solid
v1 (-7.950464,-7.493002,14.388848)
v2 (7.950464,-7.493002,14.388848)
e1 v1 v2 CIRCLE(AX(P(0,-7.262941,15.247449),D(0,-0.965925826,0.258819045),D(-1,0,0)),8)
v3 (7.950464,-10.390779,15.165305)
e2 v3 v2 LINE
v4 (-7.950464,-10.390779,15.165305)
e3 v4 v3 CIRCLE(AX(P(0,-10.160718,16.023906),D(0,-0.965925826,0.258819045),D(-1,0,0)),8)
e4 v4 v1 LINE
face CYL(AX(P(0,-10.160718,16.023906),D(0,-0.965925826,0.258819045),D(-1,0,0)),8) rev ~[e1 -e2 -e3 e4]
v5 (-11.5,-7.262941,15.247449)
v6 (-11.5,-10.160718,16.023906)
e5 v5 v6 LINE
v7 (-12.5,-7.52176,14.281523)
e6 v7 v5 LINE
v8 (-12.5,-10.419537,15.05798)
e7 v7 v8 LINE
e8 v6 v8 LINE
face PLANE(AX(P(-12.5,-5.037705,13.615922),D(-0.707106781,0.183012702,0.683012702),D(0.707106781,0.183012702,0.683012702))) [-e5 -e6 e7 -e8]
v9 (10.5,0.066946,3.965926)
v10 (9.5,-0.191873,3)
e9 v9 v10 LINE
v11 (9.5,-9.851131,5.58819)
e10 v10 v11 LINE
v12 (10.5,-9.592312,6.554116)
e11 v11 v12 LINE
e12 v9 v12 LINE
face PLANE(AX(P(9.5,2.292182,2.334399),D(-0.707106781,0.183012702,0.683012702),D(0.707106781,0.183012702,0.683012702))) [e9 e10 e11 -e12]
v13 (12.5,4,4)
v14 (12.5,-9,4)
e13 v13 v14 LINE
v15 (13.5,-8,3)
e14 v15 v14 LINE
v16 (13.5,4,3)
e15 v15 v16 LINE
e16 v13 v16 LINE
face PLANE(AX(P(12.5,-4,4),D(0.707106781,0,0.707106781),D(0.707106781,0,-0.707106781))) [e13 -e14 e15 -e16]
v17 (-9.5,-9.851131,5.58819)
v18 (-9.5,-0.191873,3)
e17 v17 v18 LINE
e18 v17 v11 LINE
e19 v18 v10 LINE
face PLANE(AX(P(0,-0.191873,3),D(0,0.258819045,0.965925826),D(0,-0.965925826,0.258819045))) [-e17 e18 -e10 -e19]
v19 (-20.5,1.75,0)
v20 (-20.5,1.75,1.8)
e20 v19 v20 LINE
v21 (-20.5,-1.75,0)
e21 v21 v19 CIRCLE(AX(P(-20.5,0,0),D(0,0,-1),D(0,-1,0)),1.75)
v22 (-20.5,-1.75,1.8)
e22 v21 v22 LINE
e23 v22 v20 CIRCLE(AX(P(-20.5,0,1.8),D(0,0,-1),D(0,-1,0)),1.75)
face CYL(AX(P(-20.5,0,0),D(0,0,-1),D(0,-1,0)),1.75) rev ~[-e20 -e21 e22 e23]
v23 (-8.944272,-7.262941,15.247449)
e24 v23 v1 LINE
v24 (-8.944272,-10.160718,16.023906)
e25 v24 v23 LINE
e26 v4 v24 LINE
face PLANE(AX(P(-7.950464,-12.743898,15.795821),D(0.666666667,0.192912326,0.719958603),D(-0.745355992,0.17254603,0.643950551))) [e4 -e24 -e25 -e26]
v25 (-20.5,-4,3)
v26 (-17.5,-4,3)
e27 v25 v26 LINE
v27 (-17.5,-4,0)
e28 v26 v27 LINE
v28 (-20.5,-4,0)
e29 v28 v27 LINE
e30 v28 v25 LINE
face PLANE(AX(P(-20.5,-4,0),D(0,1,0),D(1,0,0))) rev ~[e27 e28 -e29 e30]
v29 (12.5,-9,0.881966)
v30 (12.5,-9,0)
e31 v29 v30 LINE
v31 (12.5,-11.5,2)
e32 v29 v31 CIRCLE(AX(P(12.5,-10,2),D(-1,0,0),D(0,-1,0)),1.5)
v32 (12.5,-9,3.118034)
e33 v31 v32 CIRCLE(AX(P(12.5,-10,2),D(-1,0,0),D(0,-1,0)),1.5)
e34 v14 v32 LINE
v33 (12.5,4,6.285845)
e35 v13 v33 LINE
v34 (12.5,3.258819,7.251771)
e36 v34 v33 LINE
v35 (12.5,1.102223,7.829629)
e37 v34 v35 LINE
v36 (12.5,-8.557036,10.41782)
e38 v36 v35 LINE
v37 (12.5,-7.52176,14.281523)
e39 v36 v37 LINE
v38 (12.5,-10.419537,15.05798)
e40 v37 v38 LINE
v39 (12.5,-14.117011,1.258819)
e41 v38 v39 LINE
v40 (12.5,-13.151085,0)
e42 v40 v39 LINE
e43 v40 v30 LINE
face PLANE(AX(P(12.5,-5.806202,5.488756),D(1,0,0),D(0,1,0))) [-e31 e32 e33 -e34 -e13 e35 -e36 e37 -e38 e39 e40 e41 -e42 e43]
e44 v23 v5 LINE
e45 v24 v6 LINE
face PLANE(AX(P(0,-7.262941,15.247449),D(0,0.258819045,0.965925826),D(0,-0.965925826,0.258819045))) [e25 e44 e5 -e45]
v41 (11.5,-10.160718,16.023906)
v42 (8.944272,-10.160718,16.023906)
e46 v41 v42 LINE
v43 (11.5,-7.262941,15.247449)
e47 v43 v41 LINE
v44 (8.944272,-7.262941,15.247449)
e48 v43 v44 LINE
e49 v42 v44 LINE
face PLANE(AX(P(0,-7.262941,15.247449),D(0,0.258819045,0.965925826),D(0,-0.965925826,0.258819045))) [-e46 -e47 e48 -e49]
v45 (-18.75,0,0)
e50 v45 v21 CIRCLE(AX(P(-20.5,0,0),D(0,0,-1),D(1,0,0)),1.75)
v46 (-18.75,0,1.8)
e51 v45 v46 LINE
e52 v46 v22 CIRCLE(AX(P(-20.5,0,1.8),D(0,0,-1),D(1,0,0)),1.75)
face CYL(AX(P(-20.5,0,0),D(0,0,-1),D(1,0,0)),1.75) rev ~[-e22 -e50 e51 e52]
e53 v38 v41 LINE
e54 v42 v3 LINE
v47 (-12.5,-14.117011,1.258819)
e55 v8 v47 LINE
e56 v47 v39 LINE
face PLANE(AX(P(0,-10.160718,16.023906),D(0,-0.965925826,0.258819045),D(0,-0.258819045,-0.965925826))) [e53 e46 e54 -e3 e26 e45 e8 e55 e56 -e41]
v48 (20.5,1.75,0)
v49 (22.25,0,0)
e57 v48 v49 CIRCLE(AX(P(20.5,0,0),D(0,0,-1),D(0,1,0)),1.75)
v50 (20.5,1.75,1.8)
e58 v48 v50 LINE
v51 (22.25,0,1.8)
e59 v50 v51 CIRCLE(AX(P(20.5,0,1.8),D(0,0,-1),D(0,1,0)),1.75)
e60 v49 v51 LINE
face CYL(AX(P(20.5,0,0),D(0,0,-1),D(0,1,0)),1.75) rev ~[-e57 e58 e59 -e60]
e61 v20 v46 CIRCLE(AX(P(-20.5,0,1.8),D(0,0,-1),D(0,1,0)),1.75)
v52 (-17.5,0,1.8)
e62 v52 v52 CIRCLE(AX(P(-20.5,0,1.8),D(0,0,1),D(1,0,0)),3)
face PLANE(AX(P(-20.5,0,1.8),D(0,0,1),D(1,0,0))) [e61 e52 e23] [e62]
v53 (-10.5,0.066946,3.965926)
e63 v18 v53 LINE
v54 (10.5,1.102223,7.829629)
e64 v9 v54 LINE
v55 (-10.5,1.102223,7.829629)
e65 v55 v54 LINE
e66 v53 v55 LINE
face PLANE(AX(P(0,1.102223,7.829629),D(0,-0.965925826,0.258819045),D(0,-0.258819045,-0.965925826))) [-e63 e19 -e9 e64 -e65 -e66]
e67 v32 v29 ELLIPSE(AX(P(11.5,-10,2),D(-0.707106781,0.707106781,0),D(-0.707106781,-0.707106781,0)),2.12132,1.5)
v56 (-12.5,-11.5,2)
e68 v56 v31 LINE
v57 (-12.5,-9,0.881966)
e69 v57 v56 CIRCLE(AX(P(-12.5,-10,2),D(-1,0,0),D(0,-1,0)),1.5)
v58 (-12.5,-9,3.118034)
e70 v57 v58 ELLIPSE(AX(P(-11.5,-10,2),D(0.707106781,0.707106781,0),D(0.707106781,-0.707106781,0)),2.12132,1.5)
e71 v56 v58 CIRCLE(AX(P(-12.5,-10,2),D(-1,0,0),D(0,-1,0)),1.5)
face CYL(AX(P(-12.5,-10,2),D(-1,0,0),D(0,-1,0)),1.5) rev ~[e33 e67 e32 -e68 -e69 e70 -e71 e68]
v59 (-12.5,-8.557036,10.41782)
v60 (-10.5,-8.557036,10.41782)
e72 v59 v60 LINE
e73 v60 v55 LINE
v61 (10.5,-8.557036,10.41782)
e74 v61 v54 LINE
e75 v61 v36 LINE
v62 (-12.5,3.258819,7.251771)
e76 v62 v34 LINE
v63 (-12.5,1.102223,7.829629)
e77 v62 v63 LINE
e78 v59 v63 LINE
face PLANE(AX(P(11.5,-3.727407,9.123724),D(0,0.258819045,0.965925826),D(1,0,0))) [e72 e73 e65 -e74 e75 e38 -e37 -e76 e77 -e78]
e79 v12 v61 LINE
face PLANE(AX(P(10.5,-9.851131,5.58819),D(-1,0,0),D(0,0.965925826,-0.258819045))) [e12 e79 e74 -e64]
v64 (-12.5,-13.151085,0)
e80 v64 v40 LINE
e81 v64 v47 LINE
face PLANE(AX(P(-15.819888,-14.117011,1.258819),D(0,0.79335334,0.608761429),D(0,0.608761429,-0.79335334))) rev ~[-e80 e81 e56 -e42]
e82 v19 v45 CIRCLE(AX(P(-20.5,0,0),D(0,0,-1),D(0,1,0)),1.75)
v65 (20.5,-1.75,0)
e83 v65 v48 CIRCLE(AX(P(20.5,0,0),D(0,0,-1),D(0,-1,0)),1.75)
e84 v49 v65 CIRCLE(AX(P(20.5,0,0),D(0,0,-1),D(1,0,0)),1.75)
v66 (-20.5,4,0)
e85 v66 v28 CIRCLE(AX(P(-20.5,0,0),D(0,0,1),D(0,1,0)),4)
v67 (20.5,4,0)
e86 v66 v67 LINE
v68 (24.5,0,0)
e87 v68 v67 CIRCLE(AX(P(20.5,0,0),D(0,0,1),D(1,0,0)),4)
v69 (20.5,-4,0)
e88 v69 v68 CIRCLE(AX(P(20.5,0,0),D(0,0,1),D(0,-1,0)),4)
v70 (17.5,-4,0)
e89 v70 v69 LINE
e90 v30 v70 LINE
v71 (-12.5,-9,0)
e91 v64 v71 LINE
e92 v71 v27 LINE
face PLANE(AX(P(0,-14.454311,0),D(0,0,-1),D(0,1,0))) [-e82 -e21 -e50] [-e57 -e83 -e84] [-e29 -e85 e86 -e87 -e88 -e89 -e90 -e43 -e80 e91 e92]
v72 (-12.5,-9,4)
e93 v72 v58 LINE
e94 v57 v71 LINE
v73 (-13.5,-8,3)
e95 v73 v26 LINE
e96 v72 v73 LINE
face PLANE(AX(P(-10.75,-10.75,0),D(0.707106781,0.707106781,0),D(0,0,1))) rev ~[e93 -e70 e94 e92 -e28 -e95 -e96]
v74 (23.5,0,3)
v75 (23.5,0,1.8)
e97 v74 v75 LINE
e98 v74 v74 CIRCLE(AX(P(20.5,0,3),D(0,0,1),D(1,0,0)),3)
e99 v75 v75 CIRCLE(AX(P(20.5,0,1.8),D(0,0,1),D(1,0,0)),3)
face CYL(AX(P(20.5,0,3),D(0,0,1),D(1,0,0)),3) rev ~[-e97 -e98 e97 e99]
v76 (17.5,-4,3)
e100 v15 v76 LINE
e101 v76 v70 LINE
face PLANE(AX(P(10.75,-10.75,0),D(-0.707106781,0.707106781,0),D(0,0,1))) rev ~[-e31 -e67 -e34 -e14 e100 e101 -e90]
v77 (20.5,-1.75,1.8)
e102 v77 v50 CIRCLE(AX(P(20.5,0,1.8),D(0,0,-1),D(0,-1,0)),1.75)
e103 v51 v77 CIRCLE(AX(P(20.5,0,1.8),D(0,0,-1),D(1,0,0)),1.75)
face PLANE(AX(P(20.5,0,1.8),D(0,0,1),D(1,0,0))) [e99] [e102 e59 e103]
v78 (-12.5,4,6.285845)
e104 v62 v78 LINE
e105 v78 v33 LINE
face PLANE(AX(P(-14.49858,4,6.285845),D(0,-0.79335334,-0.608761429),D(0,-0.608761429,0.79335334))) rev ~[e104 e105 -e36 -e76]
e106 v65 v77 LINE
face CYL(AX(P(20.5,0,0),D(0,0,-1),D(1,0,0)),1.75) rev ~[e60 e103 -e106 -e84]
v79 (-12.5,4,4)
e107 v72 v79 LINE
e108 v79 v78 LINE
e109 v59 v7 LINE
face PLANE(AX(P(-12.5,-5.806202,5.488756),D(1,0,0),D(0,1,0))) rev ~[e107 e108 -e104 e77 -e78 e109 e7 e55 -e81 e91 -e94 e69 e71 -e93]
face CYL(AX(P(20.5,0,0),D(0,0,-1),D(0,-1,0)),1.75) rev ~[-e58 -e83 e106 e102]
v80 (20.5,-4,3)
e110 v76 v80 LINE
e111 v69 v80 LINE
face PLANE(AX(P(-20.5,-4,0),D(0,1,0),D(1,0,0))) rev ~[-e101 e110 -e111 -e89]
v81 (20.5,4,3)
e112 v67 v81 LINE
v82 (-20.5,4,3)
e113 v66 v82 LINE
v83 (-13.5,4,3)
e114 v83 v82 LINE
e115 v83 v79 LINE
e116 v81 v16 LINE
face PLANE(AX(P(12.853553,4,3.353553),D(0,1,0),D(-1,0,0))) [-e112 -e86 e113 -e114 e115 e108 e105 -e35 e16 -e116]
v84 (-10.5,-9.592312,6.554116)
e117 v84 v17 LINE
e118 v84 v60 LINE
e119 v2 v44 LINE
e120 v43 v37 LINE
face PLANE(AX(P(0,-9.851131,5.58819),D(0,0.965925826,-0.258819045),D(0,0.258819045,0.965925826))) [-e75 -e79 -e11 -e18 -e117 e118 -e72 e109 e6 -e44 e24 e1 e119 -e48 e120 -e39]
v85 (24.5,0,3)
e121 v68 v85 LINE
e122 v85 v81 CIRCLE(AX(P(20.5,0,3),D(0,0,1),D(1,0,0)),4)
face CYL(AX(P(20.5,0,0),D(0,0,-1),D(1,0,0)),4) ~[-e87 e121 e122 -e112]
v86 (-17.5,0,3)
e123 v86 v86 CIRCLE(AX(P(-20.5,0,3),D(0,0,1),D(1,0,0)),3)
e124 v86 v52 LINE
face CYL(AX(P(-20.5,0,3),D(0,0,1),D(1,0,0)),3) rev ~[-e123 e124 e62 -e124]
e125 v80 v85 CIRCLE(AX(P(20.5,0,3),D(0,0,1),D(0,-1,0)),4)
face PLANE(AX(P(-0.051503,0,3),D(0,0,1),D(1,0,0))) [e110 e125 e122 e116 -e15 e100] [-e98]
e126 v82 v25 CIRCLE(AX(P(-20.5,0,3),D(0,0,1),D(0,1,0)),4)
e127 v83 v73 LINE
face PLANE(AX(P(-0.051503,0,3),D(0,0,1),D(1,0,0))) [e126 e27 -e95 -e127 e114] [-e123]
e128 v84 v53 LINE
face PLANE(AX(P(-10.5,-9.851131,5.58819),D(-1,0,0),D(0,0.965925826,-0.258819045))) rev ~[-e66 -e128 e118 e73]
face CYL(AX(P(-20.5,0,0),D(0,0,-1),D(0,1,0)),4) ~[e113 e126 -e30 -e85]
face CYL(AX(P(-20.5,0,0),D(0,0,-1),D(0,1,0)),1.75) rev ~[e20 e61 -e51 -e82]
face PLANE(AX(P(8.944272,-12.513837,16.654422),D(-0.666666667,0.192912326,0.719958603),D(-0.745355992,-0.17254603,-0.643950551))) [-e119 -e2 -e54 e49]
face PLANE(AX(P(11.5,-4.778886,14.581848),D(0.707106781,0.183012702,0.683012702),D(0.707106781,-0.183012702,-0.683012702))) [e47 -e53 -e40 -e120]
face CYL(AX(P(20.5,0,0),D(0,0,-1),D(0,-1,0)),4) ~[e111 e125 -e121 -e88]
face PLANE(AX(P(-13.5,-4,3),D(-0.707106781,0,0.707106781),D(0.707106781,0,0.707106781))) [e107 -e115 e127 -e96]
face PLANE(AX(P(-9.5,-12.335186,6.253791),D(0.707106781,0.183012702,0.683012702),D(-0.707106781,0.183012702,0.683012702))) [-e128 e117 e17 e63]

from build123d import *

# Parameters (mm, degrees)
F2_DEPTH       = 3
F3_R           = 3
F4_DEPTH       = 1.2
F5_DEPTH       = 12.5
F6_W           = 2
F6_H           = 10
F7_DEPTH       = 5
F9_DEPTH       = 3
F10_SIZE       = 5
F11_T1_DEPTH   = 15.1433659759
F11_T3_DEPTH   = 15.1433659759
F11_T5_DEPTH   = 8
F11_T10_DEPTH  = 7.571682988
F11_T15_DEPTH  = 7.571682988
F11_T17_DEPTH  = 7.8722554791
F11_T19_DEPTH  = 31.6397752967
F11_T21_DEPTH  = 8.1433659759
F11_T23_DEPTH  = 28.997160307
F12_R          = 1.5
F13_DEPTH      = 37.001
F13_DEPTH_BACK = 12.001


# Not quite as in the source:
# - a fillet or chamfer that OpenCascade refuses, or shapes differently, is made with other operations: its cross-section is extruded or revolved along the edge and cut away or added


with BuildPart() as f2:
    # F0 (on Top) → F2 (new body)
    with BuildSketch(Plane.XY):
        with BuildLine():
            ThreePointArc((20.5, -4), (16.5, 0), (20.5, 4))
            Line((20.5, 4), (-20.5, 4))
            ThreePointArc((-20.5, 4), (-17.6715728753, 2.8284271247), (-16.5, 0))
            ThreePointArc((-16.5, 0), (-17.6715728753, -2.8284271247), (-20.5, -4))
            Line((-20.5, -4), (20.5, -4))
        make_face()
        with BuildLine():
            ThreePointArc((24.5, 0), (23.3284271247, 2.8284271247), (20.5, 4))
            Line((20.5, 4), (20.5, 1.75))
            ThreePointArc((20.5, 1.75), (21.7374368671, 1.2374368671), (22.25, 0))
            ThreePointArc((22.25, 0), (21.7374368671, -1.2374368671), (20.5, -1.75))
            Line((20.5, -1.75), (20.5, -4))
            ThreePointArc((20.5, -4), (23.3284271247, -2.8284271247), (24.5, 0))
        make_face()
        with BuildLine():
            Line((20.5, 1.75), (20.5, 4))
            ThreePointArc((20.5, 4), (16.5, 0), (20.5, -4))
            Line((20.5, -4), (20.5, -1.75))
            ThreePointArc((20.5, -1.75), (18.75, 0), (20.5, 1.75))
        make_face()
        with BuildLine():
            ThreePointArc((-16.5, 0), (-17.6715728753, 2.8284271247), (-20.5, 4))
            Line((-20.5, 4), (-20.5, 1.75))
            ThreePointArc((-20.5, 1.75), (-19.2625631329, 1.2374368671), (-18.75, 0))
            ThreePointArc((-18.75, 0), (-19.2625631329, -1.2374368671), (-20.5, -1.75))
            Line((-20.5, -1.75), (-20.5, -4))
            ThreePointArc((-20.5, -4), (-17.6715728753, -2.8284271247), (-16.5, 0))
        make_face()
        with BuildLine():
            Line((-20.5, 1.75), (-20.5, 4))
            ThreePointArc((-20.5, 4), (-24.5, 0), (-20.5, -4))
            Line((-20.5, -4), (-20.5, -1.75))
            ThreePointArc((-20.5, -1.75), (-22.25, 0), (-20.5, 1.75))
        make_face()
    extrude(amount=F2_DEPTH)

    # F3 (on face) → F4 (cut)
    with BuildSketch(Plane.XY.offset(3)):
        with Locations((-20.5, 0)):
            Circle(F3_R)
        with Locations((20.5, 0)):
            Circle(F3_R)
    extrude(amount=-F4_DEPTH, mode=Mode.SUBTRACT)

    # F1 (on Right) → F5 (join, symmetric)
    with BuildSketch(Plane.YZ):
        Polygon((-14.454310627, 0), (0, 0), (4, 0), (4, 7.0531719961), (1.1022225211, 7.8296291314), (-0.1918727044, 3), (-9.8511309673, 5.588190451), (-7.2629405162, 15.2474487139), (-10.1607179951, 16.0239058492), align=None)
    extrude(amount=F5_DEPTH, both=True)

    # F6 (on face) → F7 (join, through all)
    with BuildSketch(Plane(origin=(0, 0.737146966, 2.7510699296), x_dir=(1, 0, 0), z_dir=(0, 0.2588190451, 0.9659258263))):
        with Locations((11.5, -5.9617919358)):
            Rectangle(F6_W, F6_H)
        with Locations((-11.5, -5.9617919358)):
            Rectangle(F6_W, F6_H)
    extrude(amount=F7_DEPTH)

    # F8 (on face) → F9 (cut, through all)
    with BuildSketch(Plane(origin=(0, -13.4860554121, 3.6135776568), x_dir=(1, 0, 0), z_dir=(0, -0.9659258263, 0.2588190451))):
        with BuildLine():
            ThreePointArc((-8, 12.8481171687), (0, 4.8481171687), (8, 12.8481171687))
            Line((8, 12.8481171687), (-8, 12.8481171687))
        make_face()
    extrude(amount=-F9_DEPTH, mode=Mode.SUBTRACT)

    # F10
    f10_edges = [f2.edges().sort_by_distance(p)[0] for p in [
        (-12.5, -4, 1.5),
        (12.5, -4, 1.5),
    ]]
    chamfer(f10_edges, length=F10_SIZE)

    # F11: chamfer of 1 on 12 edges, made by hand

    # F11_s2 → F11_t1 (join)
    with BuildSketch(Plane(origin=(0, -13.0723329483, 3.5027210567), x_dir=(1, 0, 0), z_dir=(0, 0.9659258263, -0.2588190451))):
        Polygon((-9.5, -2.8481171687), (-10.5, -3.8481171687), (-10.5, -2.8481171687), align=None)
    extrude(amount=F11_T1_DEPTH)

    # F11_s4 → F11_t3 (join)
    with BuildSketch(Plane(origin=(0, 1.5550353448, -0.4166704648), x_dir=(1, 0, 0), z_dir=(0, -0.9659258263, 0.2588190451))):
        Polygon((9.5, 2.8481171687), (10.5, 3.8481171687), (10.5, 2.8481171687), align=None)
    extrude(amount=F11_T3_DEPTH)

    # F11_s6 → F11_t5 (join)
    with BuildSketch(Plane.XZ.offset(-4)):
        Polygon((12.5, 4), (13.5, 3), (12.5, 3), align=None)
        Polygon((-13.5, 3), (-12.5, 4), (-12.5, 3), align=None)
    extrude(amount=F11_T5_DEPTH)


with BuildPart() as f11_tool8:
    # F11_s9 → F11_t10 (new body)
    with BuildSketch(Plane.XZ.offset(4)):
        Polygon((-13.5, 3), (-12.5, 4), (-12.5, 3), align=None)
    extrude(amount=F11_T10_DEPTH)

    split(bisect_by=Plane(origin=(-10.75, -10.75, 0), x_dir=(0, 0, 1), z_dir=(0.7071067812, 0.7071067812, 0)), keep=Keep.TOP)


with BuildPart() as f2_1:
    add(f2.part)

    # F11_t7: union F11_tool8
    add(f11_tool8.part)


with BuildPart() as f11_tool13:
    # F11_s14 → F11_t15 (new body)
    with BuildSketch(Plane.XZ.offset(4)):
        Polygon((12.5, 4), (13.5, 3), (12.5, 3), align=None)
    extrude(amount=F11_T15_DEPTH)

    split(bisect_by=Plane(origin=(10.75, -10.75, 0), x_dir=(0, 0, 1), z_dir=(-0.7071067812, 0.7071067812, 0)), keep=Keep.TOP)


with BuildPart() as f2_2:
    add(f2_1.part)

    # F11_t12: union F11_tool13
    add(f11_tool13.part)

    # F11_s18 → F11_t17 (cut)
    with BuildSketch(Plane(origin=(0, -15.8391741119, 4.244093912), x_dir=(1, 0, 0), z_dir=(0, 0.9659258263, -0.2588190451))):
        with BuildLine():
            Line((-7.95046392, -11.9592282798), (-8.94427191, -12.8481171687))
            Line((-8.94427191, -12.8481171687), (-8, -12.8481171687))
            ThreePointArc((-8, -12.8481171687), (-7.9868043053, -12.3888166251), (-7.95046392, -11.9592282798))
        make_face()
        with BuildLine():
            Line((8.94427191, -12.8481171687), (7.95046392, -11.9592282798))
            ThreePointArc((7.95046392, -11.9592282798), (7.9868043053, -12.3888166251), (8, -12.8481171687))
            Line((8, -12.8481171687), (8.94427191, -12.8481171687))
        make_face()
    extrude(amount=F11_T17_DEPTH, mode=Mode.SUBTRACT)

    # F11_s20 → F11_t19 (cut)
    with BuildSketch(Plane.YZ.offset(-15.8198876484)):
        Polygon((-14.1170110805, 1.2588190451), (-13.1510852542, 0), (-14.454310627, 0), align=None)
    extrude(amount=F11_T19_DEPTH, mode=Mode.SUBTRACT)

    # F11_s22 → F11_t21 (cut)
    with BuildSketch(Plane(origin=(0, -8.1042229181, 2.1715199862), x_dir=(1, 0, 0), z_dir=(0, -0.9659258263, 0.2588190451))):
        Polygon((-12.5, 11.8481171687), (-11.5, 12.8481171687), (-12.5, 12.8481171687), align=None)
        Polygon((11.5, 12.8481171687), (12.5, 11.8481171687), (12.5, 12.8481171687), align=None)
    extrude(amount=F11_T21_DEPTH, mode=Mode.SUBTRACT)

    # F11_s24 → F11_t23 (cut)
    with BuildSketch(Plane.YZ.offset(-14.4985801535)):
        Polygon((4, 6.2858450082), (3.2588190451, 7.2517708344), (4, 7.0531719961), align=None)
    extrude(amount=F11_T23_DEPTH, mode=Mode.SUBTRACT)

    # F12 (on face) → F13 (cut, two sides)
    with BuildSketch(Plane(origin=(-12.5, 0, 0), x_dir=(0, -1, 0), z_dir=(-1, 0, 0))) as f13_sk:
        with Locations((10, 2)):
            Circle(F12_R)
    extrude(amount=-F13_DEPTH, mode=Mode.SUBTRACT)
    extrude(f13_sk.sketch, amount=F13_DEPTH_BACK, mode=Mode.SUBTRACT)


solid = f2_2.part
